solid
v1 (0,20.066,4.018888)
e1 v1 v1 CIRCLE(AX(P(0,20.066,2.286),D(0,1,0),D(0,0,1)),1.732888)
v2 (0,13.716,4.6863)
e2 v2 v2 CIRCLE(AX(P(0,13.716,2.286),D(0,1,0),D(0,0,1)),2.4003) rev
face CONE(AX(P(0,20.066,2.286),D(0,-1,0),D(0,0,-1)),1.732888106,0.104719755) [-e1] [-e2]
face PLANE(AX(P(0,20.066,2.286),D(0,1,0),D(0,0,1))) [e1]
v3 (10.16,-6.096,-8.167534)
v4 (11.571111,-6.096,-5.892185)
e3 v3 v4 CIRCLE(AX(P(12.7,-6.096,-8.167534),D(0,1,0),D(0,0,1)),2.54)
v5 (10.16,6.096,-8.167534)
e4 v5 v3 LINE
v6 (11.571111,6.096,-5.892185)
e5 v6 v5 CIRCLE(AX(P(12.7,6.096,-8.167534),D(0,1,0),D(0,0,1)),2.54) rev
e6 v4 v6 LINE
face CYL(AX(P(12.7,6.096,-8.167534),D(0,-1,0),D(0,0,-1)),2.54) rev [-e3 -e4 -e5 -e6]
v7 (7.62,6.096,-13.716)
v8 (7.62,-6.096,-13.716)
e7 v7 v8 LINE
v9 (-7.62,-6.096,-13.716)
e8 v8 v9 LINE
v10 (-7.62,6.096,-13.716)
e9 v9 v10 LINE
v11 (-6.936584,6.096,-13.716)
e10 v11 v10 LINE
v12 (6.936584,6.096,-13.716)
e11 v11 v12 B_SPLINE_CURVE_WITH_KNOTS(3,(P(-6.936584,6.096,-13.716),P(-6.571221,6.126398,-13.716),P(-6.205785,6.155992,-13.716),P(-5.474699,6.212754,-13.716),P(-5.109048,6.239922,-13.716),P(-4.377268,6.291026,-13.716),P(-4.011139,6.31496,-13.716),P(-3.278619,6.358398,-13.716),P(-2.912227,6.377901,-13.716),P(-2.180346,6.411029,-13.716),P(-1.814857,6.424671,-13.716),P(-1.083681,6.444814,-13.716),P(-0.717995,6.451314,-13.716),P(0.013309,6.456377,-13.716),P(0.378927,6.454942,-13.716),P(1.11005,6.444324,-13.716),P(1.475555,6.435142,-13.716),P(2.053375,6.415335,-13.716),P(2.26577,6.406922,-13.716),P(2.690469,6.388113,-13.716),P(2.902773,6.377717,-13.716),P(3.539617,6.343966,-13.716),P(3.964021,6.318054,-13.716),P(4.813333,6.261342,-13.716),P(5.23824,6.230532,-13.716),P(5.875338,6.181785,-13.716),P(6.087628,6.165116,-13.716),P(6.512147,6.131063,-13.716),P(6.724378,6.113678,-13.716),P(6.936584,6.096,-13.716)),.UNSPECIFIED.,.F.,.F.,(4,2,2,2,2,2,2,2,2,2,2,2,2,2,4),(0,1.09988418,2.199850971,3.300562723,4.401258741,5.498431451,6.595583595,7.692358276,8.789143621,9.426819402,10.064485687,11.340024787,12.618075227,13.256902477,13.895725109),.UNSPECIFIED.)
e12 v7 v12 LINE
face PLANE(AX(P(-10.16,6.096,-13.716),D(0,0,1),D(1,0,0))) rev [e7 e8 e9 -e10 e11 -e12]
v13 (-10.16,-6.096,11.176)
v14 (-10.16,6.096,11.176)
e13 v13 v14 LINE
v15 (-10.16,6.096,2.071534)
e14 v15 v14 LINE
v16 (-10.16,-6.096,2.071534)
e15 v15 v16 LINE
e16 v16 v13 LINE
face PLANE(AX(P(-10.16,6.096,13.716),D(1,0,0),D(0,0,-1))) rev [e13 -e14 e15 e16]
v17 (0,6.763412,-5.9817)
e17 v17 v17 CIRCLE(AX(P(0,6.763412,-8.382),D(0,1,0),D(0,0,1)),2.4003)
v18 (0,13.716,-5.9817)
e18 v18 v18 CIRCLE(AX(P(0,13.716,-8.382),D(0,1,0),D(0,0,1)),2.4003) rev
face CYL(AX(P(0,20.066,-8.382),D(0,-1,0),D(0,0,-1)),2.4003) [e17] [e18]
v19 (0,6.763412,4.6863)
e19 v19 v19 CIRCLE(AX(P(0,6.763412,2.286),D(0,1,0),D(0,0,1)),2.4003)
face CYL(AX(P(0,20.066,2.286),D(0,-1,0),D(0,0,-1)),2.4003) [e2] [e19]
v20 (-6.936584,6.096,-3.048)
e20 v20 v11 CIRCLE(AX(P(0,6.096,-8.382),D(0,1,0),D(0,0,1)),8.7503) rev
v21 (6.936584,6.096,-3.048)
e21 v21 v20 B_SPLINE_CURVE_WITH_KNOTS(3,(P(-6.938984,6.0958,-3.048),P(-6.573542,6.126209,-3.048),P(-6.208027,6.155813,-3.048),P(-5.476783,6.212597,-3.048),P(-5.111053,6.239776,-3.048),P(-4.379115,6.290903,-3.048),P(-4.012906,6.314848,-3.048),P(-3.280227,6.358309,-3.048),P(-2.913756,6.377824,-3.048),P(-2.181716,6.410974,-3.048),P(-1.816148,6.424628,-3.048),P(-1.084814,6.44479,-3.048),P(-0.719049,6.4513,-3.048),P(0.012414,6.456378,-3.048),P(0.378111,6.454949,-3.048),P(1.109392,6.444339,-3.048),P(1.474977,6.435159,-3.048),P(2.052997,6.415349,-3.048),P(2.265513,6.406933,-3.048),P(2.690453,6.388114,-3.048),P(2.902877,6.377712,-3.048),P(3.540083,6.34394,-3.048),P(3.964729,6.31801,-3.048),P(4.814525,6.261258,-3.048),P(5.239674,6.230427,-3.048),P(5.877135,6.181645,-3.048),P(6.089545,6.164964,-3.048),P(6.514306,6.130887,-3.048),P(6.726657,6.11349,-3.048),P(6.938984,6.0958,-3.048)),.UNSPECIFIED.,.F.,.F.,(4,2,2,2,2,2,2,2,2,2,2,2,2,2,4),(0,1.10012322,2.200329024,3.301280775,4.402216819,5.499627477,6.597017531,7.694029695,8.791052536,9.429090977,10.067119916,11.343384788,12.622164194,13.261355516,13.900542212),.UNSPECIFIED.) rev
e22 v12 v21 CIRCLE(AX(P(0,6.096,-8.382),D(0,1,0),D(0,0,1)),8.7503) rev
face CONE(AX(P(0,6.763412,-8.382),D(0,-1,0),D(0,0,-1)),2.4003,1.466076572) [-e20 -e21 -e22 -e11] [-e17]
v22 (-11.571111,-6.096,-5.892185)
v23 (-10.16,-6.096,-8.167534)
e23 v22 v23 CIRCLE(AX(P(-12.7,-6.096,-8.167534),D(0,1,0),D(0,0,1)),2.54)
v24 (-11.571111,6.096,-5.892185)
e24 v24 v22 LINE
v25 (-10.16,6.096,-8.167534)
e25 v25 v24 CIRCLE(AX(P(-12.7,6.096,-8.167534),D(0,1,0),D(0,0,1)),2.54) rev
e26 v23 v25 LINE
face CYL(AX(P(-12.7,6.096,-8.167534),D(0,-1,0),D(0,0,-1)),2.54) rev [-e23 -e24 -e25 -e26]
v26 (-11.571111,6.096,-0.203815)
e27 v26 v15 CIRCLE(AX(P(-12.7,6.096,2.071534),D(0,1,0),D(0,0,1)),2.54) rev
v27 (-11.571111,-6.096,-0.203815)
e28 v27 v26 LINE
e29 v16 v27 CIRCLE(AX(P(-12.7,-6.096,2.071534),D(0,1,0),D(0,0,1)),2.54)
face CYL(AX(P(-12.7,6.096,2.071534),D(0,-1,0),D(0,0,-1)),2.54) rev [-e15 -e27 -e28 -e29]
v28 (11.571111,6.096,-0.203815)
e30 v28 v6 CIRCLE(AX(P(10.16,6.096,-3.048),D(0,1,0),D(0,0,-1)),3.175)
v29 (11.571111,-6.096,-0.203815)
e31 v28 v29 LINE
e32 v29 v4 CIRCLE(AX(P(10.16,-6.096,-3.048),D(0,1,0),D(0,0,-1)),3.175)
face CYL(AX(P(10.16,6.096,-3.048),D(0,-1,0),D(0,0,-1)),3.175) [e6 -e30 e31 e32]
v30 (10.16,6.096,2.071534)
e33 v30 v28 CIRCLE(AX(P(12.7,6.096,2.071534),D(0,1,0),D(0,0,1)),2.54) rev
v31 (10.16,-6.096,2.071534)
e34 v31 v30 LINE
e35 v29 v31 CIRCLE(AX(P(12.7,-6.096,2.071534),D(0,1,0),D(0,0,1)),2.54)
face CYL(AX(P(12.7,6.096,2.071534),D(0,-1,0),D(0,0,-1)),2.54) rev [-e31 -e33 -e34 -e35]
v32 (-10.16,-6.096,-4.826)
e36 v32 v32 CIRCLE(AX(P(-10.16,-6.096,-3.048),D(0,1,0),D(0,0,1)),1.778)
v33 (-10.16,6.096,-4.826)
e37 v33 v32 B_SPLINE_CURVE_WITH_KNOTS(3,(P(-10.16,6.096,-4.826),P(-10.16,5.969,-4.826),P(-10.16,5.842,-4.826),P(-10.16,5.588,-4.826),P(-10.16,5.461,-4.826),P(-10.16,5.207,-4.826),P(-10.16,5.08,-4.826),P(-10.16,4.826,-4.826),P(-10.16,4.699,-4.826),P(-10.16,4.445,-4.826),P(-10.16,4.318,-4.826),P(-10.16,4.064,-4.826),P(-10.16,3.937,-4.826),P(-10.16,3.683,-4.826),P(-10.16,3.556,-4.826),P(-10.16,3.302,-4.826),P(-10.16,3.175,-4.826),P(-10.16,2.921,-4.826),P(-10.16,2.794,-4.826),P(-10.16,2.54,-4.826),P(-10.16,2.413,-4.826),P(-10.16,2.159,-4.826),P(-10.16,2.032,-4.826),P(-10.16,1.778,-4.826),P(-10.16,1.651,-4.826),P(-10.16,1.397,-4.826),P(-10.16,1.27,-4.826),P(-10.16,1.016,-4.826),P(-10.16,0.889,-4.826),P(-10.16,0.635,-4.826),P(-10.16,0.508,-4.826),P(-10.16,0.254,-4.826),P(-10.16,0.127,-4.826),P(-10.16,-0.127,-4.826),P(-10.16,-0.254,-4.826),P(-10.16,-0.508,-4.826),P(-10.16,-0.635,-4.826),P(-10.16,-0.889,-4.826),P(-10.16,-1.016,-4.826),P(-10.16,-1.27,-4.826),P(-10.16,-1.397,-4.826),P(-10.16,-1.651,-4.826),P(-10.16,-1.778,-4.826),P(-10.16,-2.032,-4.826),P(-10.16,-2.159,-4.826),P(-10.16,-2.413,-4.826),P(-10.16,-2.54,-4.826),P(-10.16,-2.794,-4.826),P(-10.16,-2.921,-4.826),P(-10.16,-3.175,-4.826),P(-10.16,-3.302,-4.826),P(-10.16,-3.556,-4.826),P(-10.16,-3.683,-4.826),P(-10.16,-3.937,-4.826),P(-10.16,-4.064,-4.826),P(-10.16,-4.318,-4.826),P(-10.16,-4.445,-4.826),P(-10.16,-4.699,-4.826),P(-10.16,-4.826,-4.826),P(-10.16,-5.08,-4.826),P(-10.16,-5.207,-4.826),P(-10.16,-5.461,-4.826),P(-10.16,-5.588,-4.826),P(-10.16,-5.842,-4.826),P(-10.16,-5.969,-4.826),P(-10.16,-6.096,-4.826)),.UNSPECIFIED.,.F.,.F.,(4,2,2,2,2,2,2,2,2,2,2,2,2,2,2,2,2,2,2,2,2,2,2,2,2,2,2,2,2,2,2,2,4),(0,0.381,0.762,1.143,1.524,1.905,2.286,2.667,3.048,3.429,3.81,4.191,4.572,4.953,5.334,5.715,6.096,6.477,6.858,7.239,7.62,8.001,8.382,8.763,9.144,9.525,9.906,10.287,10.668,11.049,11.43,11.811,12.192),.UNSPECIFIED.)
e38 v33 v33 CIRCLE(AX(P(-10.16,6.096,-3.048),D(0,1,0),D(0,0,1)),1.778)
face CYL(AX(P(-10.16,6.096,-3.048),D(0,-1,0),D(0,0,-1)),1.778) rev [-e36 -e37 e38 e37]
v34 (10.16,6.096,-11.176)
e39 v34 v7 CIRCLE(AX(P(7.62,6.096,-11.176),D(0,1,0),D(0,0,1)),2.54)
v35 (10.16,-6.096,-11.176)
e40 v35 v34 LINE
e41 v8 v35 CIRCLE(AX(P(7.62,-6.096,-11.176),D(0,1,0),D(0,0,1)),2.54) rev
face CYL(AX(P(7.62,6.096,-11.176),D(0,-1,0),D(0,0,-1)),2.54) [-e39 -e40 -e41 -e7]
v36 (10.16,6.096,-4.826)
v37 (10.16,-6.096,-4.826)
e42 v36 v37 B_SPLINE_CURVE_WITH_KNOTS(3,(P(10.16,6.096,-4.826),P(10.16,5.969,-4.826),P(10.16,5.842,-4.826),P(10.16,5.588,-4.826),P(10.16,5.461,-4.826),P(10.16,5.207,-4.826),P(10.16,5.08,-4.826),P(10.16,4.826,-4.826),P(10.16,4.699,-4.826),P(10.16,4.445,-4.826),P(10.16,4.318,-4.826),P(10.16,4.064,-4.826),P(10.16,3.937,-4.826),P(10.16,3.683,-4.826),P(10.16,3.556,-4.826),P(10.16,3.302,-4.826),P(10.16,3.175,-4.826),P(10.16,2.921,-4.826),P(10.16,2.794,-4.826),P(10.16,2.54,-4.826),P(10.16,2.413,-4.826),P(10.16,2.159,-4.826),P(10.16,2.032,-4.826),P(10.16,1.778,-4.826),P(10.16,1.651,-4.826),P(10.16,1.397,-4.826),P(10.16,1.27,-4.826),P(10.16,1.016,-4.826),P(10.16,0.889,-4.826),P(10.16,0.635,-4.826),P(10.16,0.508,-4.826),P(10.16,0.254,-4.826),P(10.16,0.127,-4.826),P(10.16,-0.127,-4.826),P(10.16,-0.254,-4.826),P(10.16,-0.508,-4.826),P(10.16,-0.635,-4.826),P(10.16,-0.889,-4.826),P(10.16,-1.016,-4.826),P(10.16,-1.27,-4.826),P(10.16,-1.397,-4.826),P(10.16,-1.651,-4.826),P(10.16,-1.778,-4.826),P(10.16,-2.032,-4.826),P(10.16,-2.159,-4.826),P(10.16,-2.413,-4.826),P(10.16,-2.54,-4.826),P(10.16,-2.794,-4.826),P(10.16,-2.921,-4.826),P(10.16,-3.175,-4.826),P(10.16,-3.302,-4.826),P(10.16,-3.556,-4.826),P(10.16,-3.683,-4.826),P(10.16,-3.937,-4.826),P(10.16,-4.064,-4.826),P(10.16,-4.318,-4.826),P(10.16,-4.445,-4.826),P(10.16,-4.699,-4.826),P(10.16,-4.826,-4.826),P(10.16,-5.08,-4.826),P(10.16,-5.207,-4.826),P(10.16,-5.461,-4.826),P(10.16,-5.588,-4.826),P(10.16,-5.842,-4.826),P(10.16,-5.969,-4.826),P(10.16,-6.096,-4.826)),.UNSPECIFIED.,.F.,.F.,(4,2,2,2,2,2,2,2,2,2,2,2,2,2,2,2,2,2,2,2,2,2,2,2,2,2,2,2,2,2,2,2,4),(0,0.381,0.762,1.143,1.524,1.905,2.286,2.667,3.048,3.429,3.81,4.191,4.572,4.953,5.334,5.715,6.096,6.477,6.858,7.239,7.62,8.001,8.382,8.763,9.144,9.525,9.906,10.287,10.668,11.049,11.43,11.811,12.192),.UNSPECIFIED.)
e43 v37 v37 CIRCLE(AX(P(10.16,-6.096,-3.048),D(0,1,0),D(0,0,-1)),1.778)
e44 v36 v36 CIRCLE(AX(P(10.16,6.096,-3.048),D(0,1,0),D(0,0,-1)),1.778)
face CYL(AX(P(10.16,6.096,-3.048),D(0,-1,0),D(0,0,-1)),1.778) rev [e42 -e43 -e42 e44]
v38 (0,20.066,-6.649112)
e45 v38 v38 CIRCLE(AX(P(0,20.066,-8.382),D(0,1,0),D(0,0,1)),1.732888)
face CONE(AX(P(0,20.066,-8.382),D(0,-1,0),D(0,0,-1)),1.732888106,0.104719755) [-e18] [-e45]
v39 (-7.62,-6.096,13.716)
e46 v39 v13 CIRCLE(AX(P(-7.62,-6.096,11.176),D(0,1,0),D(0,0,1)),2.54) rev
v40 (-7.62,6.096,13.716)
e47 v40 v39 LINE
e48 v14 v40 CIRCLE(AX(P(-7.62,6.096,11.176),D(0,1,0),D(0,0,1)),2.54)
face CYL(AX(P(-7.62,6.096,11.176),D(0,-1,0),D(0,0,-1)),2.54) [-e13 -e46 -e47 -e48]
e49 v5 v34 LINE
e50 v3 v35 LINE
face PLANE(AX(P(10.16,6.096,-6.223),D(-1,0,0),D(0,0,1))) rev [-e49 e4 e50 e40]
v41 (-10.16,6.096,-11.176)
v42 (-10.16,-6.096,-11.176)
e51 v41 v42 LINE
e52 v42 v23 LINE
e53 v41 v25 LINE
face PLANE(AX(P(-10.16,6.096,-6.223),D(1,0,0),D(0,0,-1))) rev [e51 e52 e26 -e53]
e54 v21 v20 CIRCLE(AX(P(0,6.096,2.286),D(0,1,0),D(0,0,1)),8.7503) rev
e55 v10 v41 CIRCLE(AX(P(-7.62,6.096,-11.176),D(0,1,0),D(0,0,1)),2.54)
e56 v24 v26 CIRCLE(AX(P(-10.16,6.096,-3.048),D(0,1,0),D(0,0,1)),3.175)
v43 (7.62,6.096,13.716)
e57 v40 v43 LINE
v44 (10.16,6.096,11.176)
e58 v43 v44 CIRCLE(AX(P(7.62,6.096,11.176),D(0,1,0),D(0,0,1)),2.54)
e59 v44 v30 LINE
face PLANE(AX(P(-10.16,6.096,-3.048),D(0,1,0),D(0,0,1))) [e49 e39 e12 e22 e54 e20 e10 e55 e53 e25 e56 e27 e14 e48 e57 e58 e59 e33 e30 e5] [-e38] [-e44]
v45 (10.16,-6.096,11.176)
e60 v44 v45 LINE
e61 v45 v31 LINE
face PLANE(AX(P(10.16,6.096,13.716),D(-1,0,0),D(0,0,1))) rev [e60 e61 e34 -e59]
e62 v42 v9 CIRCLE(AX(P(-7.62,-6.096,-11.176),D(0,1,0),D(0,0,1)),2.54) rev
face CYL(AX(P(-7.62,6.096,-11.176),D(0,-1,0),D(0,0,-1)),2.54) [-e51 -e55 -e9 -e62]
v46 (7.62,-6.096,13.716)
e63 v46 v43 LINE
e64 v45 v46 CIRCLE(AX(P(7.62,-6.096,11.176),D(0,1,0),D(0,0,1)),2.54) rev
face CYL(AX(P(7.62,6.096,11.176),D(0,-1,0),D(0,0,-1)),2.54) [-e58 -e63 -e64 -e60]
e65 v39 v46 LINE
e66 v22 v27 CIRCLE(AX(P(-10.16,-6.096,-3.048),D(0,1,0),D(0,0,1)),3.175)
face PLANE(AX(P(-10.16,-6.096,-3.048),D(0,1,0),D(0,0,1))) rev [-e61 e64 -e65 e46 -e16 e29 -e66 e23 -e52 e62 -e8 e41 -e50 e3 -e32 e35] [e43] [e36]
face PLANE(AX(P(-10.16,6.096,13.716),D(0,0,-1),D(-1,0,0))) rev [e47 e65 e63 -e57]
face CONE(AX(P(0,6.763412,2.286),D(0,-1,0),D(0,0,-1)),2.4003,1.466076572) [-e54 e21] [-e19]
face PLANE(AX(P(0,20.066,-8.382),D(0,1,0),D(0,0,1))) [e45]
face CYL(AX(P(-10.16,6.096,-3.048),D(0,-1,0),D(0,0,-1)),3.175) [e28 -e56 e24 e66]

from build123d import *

# Parameters (mm, degrees)
SKETCH1_R           = 1.778
BOSS_EXTRUDE1_DEPTH = 6.096
FILLET1_R           = 2.54
SKETCH2_R           = 2.4003
BOSS_EXTRUDE2_DEPTH = 13.97
CHAMFER1_SIZE       = 6.35
CHAMFER1_SIZE_2     = 0.667411894


with BuildPart() as part:
    # Sketch1 → Boss-Extrude1 (new, symmetric)
    with BuildSketch(Plane(origin=(0, 0, 0), x_dir=(1, 0, 0), z_dir=(0, 1, 0))):
        with BuildLine():
            Line((-10.16, 6.223), (-10.16, 13.716))
            Line((-10.16, 13.716), (10.16, 13.716))
            Line((10.16, 13.716), (10.16, 6.223))
            ThreePointArc((10.16, 6.223), (13.335, 3.048), (10.16, -0.127))
            Line((10.16, -0.127), (10.16, -13.716))
            Line((10.16, -13.716), (-10.16, -13.716))
            Line((-10.16, -13.716), (-10.16, -0.127))
            ThreePointArc((-10.16, -0.127), (-13.335, 3.048), (-10.16, 6.223))
        make_face()
        with Locations(Location((-10.16, 3.048, 0), (0, 0, 90))):
            Circle(SKETCH1_R, mode=Mode.SUBTRACT)
        with Locations(Location((10.16, 3.048, 0), (0, 0, 90))):
            Circle(SKETCH1_R, mode=Mode.SUBTRACT)
    extrude(amount=BOSS_EXTRUDE1_DEPTH, both=True)

    # Fillet1
    fillet1_edges = [part.edges().sort_by_distance(p)[0] for p in [
        (10.16, 0, -6.223),
        (10.16, 0, 0.127),
        (10.16, 0, 13.716),
        (-10.16, 0, 13.716),
        (-10.16, 0, 0.127),
        (-10.16, 0, -6.223),
        (-10.16, 0, -13.716),
        (10.16, 0, -13.716),
    ]]
    fillet(fillet1_edges, radius=FILLET1_R)

    # Sketch2 → Boss-Extrude2 (add)
    with BuildSketch(Plane(origin=(0, 6.096, 0), x_dir=(1, 0, 0), z_dir=(0, 1, 0))):
        with Locations(Location((0, 8.382, 0), (0, 0, 270))):
            Circle(SKETCH2_R)
        with Locations(Location((0, -2.286, 0), (0, 0, 270))):
            Circle(SKETCH2_R)
    extrude(amount=BOSS_EXTRUDE2_DEPTH)

    # Chamfer1
    # the kernel refuses this chamfer: 6.35, 0.667411894 mm, written as the material it adds along each edge
    with BuildSketch(Plane(origin=(0, 6.096, -8.382), x_dir=(0, 0, 1), z_dir=(-1, 0, 0))) as chamfer1_piece_1_section:
        Polygon((2.4003 + CHAMFER1_SIZE, 0), (2.4003, CHAMFER1_SIZE_2), (2.4003, 0), align=None)
    chamfer1_piece_1 = revolve(axis=Axis((0, 6.096, -8.382), (0, 1, 0)), mode=Mode.PRIVATE)
    chamfer1_piece_1 = split(chamfer1_piece_1, bisect_by=Plane(origin=(6.803322578, 6.146034246, -13.716), z_dir=(0, 0, 1)), keep=Keep.TOP, mode=Mode.PRIVATE)
    add(chamfer1_piece_1)
    with BuildSketch(Plane(origin=(0, 6.096, 2.286), x_dir=(0, 0, 1), z_dir=(-1, 0, 0))) as chamfer1_piece_2:
        Polygon((2.4003 + CHAMFER1_SIZE, 0), (2.4003, CHAMFER1_SIZE_2), (2.4003, 0), align=None)
    revolve(axis=Axis((0, 6.096, 2.286), (0, 1, 0)))
    # the kernel refuses this chamfer: 6.35, 0.667411894 mm, written as the material it takes off along each edge
    with BuildSketch(Plane(origin=(0, 20.066, -8.382), x_dir=(0, 0, 1), z_dir=(-1, 0, 0))) as chamfer1_2_piece_1:
        Polygon((2.4003, -CHAMFER1_SIZE), (2.4003 - CHAMFER1_SIZE_2, 0), (2.4003, 0), align=None)
    revolve(axis=Axis((0, 20.066, -8.382), (0, 1, 0)), mode=Mode.SUBTRACT)
    with BuildSketch(Plane(origin=(0, 20.066, 2.286), x_dir=(0, 0, 1), z_dir=(-1, 0, 0))) as chamfer1_2_piece_2:
        Polygon((2.4003, -CHAMFER1_SIZE), (2.4003 - CHAMFER1_SIZE_2, 0), (2.4003, 0), align=None)
    revolve(axis=Axis((0, 20.066, 2.286), (0, 1, 0)), mode=Mode.SUBTRACT)


solid = part.part
